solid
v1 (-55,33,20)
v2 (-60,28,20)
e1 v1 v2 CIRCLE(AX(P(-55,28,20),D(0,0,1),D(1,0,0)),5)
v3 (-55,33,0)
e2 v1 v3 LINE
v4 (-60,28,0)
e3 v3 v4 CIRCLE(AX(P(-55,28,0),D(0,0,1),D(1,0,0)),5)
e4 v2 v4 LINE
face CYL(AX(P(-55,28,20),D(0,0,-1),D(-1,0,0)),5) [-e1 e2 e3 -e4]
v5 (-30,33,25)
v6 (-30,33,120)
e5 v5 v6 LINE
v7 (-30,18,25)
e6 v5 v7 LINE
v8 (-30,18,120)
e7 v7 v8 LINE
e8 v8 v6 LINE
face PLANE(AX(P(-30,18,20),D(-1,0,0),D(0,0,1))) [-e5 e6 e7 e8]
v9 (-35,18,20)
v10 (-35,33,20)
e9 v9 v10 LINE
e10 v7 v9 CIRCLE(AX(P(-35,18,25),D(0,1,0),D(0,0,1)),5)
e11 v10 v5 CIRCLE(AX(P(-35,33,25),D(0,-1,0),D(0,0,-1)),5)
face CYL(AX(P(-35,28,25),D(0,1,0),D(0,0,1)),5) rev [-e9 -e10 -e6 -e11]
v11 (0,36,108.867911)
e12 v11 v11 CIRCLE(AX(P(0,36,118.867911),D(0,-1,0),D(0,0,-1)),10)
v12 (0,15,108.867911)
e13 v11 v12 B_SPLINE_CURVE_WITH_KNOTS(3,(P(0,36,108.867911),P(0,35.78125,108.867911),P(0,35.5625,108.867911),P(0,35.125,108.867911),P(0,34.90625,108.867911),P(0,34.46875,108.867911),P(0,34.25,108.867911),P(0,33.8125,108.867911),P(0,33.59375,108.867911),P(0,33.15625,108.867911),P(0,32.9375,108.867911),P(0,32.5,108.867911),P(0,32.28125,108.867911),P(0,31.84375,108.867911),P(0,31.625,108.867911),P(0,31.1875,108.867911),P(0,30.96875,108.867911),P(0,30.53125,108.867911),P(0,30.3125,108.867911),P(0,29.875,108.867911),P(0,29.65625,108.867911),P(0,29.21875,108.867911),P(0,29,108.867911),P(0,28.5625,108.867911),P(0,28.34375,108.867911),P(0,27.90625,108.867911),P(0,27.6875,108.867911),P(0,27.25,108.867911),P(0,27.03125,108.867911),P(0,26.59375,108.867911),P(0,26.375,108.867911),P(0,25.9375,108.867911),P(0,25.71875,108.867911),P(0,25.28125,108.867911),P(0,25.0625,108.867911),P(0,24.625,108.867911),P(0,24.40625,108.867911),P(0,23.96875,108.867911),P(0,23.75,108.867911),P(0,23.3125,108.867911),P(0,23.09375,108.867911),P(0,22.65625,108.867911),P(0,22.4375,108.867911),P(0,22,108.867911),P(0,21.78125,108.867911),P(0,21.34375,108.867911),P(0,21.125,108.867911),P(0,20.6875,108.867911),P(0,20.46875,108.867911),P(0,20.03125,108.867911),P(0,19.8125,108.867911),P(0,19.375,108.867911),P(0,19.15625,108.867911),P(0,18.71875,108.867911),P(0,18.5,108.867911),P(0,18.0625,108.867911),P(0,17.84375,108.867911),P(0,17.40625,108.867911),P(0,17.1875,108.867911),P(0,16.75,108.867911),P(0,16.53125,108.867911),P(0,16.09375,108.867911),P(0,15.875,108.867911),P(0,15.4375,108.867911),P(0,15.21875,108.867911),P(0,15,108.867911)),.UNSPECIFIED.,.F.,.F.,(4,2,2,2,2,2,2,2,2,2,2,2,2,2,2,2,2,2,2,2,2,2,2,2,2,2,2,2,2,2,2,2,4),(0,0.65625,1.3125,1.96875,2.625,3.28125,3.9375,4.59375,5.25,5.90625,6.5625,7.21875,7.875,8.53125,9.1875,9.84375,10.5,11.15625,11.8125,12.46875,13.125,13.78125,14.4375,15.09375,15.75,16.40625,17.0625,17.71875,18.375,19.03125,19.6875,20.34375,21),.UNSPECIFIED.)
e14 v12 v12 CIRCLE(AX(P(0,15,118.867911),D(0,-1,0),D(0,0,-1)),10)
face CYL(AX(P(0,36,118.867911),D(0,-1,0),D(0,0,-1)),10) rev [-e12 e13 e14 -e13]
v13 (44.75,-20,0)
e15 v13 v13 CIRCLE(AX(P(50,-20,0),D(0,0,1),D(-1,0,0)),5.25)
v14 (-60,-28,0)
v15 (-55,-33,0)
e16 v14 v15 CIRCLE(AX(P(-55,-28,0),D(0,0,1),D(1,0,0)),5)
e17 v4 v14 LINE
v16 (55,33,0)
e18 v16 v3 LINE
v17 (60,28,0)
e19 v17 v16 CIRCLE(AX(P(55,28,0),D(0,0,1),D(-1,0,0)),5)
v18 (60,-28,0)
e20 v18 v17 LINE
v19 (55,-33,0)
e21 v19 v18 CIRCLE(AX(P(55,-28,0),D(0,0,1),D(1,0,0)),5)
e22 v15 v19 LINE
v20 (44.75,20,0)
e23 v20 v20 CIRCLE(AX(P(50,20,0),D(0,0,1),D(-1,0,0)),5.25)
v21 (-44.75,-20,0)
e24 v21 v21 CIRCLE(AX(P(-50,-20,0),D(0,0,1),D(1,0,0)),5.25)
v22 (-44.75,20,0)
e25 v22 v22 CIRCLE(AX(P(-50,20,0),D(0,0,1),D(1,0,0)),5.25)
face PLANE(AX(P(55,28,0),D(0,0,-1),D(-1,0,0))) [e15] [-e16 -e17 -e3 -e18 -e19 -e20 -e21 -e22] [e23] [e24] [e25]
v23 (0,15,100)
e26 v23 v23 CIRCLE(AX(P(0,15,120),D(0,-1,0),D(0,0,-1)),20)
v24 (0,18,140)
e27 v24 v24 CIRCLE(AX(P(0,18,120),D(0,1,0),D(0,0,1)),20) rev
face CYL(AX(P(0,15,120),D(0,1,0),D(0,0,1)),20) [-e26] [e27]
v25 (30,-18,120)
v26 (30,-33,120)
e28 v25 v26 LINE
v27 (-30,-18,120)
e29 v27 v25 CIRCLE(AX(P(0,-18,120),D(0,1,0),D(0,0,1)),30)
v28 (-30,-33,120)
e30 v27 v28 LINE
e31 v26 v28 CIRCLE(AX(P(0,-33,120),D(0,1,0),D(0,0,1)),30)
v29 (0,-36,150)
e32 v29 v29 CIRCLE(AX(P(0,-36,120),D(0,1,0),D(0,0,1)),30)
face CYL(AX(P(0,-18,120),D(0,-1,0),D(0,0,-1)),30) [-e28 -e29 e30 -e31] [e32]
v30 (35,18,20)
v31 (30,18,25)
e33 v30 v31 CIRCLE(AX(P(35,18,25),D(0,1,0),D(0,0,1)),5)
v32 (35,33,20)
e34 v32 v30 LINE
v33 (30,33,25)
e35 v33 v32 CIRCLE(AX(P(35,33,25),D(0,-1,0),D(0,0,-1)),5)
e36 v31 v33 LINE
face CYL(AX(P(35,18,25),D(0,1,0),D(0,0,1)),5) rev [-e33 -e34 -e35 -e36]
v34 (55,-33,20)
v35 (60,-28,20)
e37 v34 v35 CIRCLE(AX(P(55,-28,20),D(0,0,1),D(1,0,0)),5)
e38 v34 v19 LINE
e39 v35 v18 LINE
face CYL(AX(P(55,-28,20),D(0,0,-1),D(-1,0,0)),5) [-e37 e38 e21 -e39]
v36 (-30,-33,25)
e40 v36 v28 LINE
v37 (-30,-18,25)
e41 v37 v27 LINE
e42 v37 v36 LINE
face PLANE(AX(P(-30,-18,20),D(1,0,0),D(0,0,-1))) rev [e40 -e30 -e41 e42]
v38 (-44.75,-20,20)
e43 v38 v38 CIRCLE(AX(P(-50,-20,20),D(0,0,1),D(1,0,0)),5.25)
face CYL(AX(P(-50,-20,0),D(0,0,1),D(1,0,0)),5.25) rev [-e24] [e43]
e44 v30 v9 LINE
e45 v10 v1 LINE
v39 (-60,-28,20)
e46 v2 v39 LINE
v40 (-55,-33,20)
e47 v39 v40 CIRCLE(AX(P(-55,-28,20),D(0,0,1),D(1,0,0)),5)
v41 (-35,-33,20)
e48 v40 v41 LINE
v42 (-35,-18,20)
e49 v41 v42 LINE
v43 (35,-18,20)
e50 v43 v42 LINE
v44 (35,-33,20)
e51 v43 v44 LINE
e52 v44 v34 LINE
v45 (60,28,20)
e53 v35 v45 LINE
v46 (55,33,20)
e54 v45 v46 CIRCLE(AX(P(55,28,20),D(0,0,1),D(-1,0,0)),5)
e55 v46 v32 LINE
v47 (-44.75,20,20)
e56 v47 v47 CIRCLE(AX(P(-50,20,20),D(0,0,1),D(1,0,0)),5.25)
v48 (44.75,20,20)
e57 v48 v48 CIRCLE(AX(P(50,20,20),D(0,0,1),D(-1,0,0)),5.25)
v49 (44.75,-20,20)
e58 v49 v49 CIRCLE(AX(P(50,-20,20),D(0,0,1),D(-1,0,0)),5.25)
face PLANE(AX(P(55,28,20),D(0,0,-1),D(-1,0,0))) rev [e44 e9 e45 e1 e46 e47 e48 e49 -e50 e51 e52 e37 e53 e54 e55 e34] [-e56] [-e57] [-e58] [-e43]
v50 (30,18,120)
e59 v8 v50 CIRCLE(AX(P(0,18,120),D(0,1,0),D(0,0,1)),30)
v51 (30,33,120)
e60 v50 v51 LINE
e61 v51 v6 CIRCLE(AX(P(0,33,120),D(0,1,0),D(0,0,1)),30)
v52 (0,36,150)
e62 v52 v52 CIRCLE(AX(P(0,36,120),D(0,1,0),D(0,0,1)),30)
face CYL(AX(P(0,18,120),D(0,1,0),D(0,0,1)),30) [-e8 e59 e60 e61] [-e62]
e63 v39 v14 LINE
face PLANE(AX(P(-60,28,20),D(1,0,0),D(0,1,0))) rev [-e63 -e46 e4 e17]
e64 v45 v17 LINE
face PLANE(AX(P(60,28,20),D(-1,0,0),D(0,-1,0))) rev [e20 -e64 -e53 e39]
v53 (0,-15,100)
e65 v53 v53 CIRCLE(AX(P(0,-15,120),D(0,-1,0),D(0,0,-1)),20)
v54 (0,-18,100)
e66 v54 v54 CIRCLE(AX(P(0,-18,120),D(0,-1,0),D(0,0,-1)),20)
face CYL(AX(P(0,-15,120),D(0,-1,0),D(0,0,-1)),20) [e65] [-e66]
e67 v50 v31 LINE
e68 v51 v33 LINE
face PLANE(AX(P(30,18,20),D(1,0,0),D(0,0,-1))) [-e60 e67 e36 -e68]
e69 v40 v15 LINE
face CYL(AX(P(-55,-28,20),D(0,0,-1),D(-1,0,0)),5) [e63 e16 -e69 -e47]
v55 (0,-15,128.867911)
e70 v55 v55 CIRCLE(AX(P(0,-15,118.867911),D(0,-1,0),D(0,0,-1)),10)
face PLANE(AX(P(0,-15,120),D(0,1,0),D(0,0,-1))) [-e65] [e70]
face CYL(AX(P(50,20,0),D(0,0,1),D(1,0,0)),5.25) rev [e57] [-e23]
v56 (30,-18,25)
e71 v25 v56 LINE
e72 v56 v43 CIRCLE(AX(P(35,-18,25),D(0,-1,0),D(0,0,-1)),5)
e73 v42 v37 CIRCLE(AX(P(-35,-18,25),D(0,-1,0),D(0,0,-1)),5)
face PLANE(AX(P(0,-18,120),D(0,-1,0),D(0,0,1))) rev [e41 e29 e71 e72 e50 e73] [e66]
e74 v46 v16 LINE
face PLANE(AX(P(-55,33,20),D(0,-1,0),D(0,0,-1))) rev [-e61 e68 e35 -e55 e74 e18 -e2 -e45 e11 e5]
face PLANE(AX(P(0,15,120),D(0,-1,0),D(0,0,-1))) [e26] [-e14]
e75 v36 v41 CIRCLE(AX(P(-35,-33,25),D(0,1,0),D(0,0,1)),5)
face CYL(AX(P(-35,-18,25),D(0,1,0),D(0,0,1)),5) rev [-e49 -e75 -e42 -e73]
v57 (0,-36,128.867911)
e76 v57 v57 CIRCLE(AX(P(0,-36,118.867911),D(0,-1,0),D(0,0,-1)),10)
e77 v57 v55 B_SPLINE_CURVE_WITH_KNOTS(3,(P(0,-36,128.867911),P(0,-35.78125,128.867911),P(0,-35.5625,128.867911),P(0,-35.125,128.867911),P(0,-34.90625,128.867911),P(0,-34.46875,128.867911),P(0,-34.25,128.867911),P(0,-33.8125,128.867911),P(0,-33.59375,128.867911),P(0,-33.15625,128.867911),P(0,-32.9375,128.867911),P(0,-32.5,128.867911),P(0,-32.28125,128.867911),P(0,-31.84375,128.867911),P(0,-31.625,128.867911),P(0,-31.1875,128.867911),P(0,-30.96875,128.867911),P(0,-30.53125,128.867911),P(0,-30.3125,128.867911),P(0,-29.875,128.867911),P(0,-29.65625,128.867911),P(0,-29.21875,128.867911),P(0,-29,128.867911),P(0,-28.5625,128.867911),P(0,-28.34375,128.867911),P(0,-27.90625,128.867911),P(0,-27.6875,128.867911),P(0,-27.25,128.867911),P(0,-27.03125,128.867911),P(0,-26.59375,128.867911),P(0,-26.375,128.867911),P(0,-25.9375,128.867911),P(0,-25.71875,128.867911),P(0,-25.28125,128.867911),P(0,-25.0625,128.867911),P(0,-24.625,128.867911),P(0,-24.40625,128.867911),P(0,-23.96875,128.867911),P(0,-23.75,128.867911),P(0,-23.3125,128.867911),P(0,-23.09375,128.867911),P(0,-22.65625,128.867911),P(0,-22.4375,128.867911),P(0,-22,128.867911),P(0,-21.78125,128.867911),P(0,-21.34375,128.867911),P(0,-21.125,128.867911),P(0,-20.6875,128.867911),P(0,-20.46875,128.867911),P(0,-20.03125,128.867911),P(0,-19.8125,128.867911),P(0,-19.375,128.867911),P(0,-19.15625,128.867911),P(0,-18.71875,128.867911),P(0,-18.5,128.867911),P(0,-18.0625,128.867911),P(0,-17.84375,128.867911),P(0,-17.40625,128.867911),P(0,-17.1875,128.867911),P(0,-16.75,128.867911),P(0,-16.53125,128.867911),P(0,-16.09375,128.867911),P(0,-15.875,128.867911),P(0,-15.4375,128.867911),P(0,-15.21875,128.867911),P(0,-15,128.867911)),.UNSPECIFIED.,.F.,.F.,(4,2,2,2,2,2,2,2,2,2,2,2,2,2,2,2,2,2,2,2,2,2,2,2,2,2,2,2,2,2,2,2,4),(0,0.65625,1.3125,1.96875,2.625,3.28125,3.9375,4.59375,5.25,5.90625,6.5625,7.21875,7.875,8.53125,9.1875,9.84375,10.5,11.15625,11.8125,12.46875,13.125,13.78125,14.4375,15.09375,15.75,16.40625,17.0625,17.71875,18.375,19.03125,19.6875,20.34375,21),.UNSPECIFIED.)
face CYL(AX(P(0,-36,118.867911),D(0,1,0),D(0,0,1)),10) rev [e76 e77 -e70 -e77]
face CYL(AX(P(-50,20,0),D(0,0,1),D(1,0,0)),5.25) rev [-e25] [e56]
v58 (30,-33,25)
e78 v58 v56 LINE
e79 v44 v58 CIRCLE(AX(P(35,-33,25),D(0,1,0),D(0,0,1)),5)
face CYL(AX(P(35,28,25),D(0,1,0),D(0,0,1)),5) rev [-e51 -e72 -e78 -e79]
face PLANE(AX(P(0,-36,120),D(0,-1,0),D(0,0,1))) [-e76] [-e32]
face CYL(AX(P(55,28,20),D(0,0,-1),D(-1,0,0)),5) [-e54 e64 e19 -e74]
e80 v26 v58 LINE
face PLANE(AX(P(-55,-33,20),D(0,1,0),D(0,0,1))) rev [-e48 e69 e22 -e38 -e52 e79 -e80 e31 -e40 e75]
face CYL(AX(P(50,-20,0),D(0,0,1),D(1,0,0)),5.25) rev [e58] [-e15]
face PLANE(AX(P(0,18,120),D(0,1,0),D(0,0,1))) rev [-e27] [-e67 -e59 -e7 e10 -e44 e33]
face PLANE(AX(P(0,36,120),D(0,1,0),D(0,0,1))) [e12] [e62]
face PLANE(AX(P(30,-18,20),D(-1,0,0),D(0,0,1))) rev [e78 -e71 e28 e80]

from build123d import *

# Parameters (mm, degrees)
Y_KSEKLIK_EKSTR_ZYON1_DEPTH = 20
Y_KSEKLIK_EKSTR_ZYON2_DEPTH = 15
Y_KSEKLIK_EKSTR_ZYON3_START = 3
IZIM3_R                     = 30
Y_KSEKLIK_EKSTR_ZYON3_DEPTH = 3
IZIM4_R                     = 20
Y_KSEKLIK_EKSTR_ZYON4_DEPTH = 3
IZIM5_R                     = 10
KES_EKSTR_ZYON1_DEPTH       = 169.534862862
IZIM6_R                     = 5.25
KES_EKSTR_ZYON2_DEPTH       = 148.634684272
RADYUS1_R                   = 5


with BuildPart() as part:
    # Çizim1 → Yükseklik-Ekstrüzyon1 (new body)
    with BuildSketch(Plane.XY):
        with BuildLine():
            Line((-55, 33), (55, 33))
            ThreePointArc((55, 33), (58.535533906, 31.535533906), (60, 28))
            Line((60, 28), (60, -28))
            ThreePointArc((60, -28), (58.535533906, -31.535533906), (55, -33))
            Line((55, -33), (-55, -33))
            ThreePointArc((-55, -33), (-58.535533906, -31.535533906), (-60, -28))
            Line((-60, -28), (-60, 28))
            ThreePointArc((-60, 28), (-58.535533906, 31.535533906), (-55, 33))
        make_face()
    y_kseklik_ekstr_zyon1 = extrude(amount=Y_KSEKLIK_EKSTR_ZYON1_DEPTH)

    # Çizim2 → Yükseklik-Ekstrüzyon2 (add)
    with BuildSketch(Plane(origin=(0, 33, 0), x_dir=(1, 0, 0), z_dir=(0, 1, 0))):
        with BuildLine():
            Line((-30, -20), (30, -20))
            Line((30, -20), (30, -120))
            ThreePointArc((30, -120), (0, -150), (-30, -120))
            Line((-30, -120), (-30, -20))
        make_face()
    y_kseklik_ekstr_zyon2 = extrude(amount=-Y_KSEKLIK_EKSTR_ZYON2_DEPTH)

    # Çizim3 → Yükseklik-Ekstrüzyon3 (add)
    with BuildSketch(Plane(origin=(0, 33, 0), x_dir=(1, 0, 0), z_dir=(0, 1, 0)).offset(Y_KSEKLIK_EKSTR_ZYON3_START)):
        with Locations((0, -120)):
            Circle(IZIM3_R)
    y_kseklik_ekstr_zyon3 = extrude(amount=-Y_KSEKLIK_EKSTR_ZYON3_DEPTH)

    # Çizim4 → Yükseklik-Ekstrüzyon4 (add)
    with BuildSketch(Plane(origin=(0, 18, 0), x_dir=(-1, 0, 0), z_dir=(0, -1, 0))):
        with Locations((0, -120)):
            Circle(IZIM4_R)
    y_kseklik_ekstr_zyon4 = extrude(amount=Y_KSEKLIK_EKSTR_ZYON4_DEPTH)

    # Çizim5 → Kes-Ekstrüzyon1 (cut, through all)
    with BuildSketch(Plane.XZ.offset(-15)):
        with Locations((0, 118.867910889)):
            Circle(IZIM5_R)
    kes_ekstr_zyon1 = extrude(amount=-KES_EKSTR_ZYON1_DEPTH, mode=Mode.SUBTRACT)

    # Aynalama1: Yükseklik-Ekstrüzyon1, Yükseklik-Ekstrüzyon2, Yükseklik-Ekstrüzyon3, Yükseklik-Ekstrüzyon4, Kes-Ekstrüzyon1 across plane
    add(y_kseklik_ekstr_zyon1.mirror(Plane(origin=(0, 0, 0), x_dir=(0, 0, 1), z_dir=(0, -1, 0))))
    add(y_kseklik_ekstr_zyon2.mirror(Plane(origin=(0, 0, 0), x_dir=(0, 0, 1), z_dir=(0, -1, 0))))
    add(y_kseklik_ekstr_zyon3.mirror(Plane(origin=(0, 0, 0), x_dir=(0, 0, 1), z_dir=(0, -1, 0))))
    add(y_kseklik_ekstr_zyon4.mirror(Plane(origin=(0, 0, 0), x_dir=(0, 0, 1), z_dir=(0, -1, 0))))
    add(kes_ekstr_zyon1.mirror(Plane(origin=(0, 0, 0), x_dir=(0, 0, 1), z_dir=(0, -1, 0))), mode=Mode.SUBTRACT)

    # Çizim6 → Kes-Ekstrüzyon2 (cut, through all)
    with BuildSketch(Plane.XY.offset(20)):
        with Locations((-50, 20)):
            Circle(IZIM6_R)
        with Locations((-50, -20)):
            Circle(IZIM6_R)
        with Locations((50, -20)):
            Circle(IZIM6_R)
        with Locations((50, 20)):
            Circle(IZIM6_R)
    extrude(amount=-KES_EKSTR_ZYON2_DEPTH, mode=Mode.SUBTRACT)

    # Radyus1
    radyus1_edges = [part.edges().sort_by_distance(p)[0] for p in [
        (-30, -25.5, 20),
        (-30, 25.5, 20),
        (30, -25.5, 20),
        (30, 25.5, 20),
    ]]
    fillet(radyus1_edges, radius=RADYUS1_R)


solid = part.part
